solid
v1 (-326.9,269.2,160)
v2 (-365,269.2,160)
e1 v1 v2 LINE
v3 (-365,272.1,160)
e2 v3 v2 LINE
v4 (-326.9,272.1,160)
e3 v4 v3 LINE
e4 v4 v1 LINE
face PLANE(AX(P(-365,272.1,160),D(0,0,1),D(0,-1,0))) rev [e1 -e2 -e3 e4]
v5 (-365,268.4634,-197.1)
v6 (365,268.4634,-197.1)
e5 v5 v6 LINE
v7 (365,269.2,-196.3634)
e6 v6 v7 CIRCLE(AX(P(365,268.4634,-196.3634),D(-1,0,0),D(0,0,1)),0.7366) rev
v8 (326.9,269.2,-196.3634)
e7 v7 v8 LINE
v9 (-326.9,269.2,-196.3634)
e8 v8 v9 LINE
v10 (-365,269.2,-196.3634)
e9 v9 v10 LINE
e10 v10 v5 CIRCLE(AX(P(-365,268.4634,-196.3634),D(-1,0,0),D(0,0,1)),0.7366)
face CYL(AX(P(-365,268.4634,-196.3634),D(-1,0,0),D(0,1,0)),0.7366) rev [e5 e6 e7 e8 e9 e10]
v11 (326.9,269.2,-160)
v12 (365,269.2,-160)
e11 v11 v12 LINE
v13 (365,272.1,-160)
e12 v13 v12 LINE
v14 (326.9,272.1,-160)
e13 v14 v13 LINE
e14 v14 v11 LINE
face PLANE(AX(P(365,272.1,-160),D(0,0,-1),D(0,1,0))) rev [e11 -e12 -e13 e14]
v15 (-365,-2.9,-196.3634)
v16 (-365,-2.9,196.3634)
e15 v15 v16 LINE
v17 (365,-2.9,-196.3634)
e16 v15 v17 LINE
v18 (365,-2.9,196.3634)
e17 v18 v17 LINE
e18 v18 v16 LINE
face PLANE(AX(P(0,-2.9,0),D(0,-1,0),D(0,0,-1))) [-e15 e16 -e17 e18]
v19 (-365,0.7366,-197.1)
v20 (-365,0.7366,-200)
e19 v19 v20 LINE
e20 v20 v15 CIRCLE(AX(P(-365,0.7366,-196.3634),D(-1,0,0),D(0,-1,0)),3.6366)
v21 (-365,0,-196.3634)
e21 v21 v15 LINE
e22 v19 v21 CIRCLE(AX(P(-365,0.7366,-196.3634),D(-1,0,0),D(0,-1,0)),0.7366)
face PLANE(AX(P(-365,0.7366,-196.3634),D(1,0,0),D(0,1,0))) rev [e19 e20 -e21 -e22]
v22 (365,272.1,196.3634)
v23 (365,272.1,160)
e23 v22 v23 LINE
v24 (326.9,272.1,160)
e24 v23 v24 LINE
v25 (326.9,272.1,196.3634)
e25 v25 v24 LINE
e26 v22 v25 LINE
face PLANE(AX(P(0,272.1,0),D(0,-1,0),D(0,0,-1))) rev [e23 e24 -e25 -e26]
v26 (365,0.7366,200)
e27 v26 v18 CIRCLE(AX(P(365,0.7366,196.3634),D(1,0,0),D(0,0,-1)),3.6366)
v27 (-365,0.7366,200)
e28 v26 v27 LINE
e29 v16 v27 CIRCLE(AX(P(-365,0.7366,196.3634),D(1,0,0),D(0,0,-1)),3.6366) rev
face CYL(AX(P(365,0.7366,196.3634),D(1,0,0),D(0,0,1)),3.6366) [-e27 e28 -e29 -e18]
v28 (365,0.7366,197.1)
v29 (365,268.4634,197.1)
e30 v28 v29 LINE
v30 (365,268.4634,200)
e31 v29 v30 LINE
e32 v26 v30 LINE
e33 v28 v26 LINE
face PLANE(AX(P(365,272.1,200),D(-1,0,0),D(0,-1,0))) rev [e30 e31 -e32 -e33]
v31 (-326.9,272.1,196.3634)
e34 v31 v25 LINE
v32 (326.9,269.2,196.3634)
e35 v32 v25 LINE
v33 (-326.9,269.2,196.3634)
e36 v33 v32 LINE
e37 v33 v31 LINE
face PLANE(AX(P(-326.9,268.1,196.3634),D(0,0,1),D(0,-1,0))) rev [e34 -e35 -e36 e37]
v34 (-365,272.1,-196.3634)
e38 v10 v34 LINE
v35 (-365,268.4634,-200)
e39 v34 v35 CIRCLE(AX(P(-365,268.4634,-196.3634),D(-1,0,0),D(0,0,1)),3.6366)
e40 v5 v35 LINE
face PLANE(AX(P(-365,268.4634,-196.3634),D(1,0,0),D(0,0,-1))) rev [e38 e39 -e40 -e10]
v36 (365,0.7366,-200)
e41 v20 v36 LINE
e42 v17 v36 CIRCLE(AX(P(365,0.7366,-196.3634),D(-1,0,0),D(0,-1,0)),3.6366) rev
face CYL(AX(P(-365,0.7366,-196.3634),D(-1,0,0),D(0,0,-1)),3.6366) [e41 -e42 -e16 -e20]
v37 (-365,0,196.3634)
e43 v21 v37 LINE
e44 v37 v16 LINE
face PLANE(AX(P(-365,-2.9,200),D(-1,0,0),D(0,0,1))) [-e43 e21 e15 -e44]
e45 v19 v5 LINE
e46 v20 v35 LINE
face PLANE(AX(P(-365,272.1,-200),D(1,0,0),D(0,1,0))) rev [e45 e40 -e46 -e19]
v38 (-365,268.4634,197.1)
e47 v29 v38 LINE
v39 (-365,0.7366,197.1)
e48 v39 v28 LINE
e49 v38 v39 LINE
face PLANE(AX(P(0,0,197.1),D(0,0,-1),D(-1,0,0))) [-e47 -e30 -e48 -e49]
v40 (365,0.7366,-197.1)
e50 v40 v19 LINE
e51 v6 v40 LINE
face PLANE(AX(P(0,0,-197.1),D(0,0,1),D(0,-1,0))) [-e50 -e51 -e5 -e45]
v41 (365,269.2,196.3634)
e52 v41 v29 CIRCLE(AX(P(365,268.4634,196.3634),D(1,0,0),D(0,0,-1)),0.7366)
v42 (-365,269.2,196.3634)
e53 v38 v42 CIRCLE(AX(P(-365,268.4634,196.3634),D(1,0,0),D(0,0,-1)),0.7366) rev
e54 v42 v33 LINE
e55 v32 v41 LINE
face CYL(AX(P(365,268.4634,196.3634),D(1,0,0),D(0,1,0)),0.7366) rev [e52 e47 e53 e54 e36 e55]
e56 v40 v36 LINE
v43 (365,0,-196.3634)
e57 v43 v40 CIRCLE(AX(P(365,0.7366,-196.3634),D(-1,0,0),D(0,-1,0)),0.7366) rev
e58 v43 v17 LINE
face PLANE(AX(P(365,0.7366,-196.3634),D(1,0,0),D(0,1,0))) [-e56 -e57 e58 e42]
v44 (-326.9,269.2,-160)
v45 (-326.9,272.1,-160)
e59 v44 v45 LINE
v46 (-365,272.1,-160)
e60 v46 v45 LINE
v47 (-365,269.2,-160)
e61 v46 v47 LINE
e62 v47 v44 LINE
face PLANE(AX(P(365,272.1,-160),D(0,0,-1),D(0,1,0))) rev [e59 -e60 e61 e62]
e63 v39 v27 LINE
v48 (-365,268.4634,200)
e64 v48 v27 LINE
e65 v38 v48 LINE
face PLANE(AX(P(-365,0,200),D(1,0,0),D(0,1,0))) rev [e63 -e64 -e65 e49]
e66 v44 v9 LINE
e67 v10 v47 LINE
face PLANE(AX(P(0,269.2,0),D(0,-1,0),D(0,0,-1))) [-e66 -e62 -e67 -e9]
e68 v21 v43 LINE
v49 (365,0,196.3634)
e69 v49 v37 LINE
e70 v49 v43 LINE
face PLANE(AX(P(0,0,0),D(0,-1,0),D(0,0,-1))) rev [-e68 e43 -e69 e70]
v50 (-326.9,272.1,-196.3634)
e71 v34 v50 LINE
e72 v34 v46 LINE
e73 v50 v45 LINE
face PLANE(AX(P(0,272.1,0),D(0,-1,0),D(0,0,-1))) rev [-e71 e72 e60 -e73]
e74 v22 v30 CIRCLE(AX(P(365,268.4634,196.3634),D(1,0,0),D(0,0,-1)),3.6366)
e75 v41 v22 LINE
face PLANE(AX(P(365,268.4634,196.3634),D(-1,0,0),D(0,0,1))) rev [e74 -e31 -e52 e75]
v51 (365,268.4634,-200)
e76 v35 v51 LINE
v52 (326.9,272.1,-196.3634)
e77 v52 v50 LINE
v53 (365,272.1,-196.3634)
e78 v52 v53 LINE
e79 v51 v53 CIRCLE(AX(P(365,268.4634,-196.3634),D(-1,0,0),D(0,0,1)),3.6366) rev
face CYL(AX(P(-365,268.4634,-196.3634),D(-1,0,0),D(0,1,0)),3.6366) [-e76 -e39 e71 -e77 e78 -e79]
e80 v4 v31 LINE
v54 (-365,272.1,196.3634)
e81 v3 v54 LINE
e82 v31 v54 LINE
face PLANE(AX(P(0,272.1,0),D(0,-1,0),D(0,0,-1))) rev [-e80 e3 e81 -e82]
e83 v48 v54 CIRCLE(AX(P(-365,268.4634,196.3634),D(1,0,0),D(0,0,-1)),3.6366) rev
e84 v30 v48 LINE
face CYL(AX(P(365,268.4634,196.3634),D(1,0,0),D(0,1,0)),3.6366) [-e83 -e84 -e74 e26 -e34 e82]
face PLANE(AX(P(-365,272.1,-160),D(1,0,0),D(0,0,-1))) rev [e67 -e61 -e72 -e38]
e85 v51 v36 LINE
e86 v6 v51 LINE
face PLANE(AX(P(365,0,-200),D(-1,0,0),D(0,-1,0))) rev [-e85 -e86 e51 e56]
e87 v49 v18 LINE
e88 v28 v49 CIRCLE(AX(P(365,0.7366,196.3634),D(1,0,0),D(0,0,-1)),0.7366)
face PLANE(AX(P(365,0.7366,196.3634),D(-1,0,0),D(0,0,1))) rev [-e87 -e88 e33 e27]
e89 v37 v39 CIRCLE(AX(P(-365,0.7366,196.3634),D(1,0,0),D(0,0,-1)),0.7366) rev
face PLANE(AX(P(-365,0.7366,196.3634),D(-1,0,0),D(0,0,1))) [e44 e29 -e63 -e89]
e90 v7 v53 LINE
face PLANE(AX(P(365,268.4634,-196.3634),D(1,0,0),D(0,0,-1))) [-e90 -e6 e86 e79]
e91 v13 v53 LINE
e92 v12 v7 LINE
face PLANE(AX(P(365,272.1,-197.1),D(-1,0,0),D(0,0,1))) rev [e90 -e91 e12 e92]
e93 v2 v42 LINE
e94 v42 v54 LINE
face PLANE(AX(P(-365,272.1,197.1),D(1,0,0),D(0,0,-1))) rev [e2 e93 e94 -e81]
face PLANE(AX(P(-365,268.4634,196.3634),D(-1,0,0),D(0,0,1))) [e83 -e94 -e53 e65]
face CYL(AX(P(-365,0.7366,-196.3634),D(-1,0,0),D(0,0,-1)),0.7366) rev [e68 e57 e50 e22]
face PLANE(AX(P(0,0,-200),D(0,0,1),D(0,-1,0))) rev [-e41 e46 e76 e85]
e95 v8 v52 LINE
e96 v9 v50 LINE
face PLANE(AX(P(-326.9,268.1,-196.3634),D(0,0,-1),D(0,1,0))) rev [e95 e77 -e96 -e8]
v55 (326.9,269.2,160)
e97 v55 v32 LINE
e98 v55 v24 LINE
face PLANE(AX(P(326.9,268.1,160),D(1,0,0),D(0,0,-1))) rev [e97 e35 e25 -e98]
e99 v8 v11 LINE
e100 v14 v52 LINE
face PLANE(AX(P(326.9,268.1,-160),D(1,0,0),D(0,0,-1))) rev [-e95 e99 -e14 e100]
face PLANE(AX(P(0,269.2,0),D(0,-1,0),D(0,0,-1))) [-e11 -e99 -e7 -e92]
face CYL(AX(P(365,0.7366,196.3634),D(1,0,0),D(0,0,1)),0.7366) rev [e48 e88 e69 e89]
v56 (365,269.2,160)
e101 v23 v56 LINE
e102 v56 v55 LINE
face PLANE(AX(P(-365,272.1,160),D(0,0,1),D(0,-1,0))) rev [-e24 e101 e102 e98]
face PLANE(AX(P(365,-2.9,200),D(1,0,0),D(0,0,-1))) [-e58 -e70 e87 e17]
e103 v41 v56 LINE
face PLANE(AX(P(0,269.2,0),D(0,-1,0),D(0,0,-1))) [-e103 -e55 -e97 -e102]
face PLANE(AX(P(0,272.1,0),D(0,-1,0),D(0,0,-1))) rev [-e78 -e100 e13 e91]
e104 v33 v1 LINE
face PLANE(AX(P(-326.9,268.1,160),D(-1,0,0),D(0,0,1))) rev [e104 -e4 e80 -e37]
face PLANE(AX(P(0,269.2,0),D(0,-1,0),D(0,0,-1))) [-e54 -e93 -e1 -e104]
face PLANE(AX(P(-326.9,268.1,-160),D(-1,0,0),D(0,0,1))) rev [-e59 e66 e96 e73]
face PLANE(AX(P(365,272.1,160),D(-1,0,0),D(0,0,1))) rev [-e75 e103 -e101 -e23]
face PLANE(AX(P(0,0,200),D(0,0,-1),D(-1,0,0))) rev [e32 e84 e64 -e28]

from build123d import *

# Parameters (mm, degrees)
CROQUIS1_W                         = 730
CROQUIS1_H                         = 400
BRIDA_BASE1_DEPTH                  = 2.9
BRIDA_DE_ARISTA1_STRIP_W           = 13.0732
BRIDA_DE_ARISTA1_STRIP_H           = 2.9
BRIDA_DE_ARISTA1_STRIP_CUT_DEPTH   = 730
BRIDA_DE_ARISTA1_STRIP_2_W         = 13.0732
BRIDA_DE_ARISTA1_STRIP_2_H         = 2.9
BRIDA_DE_ARISTA1_STRIP_CUT_2_DEPTH = 730
BRIDA_DE_ARISTA1_DEPTH             = 730
BRIDA_DE_ARISTA1_BEND_DEPTH        = 730
BRIDA_DE_ARISTA2_STRIP_W           = 13.0732
BRIDA_DE_ARISTA2_STRIP_H           = 2.9
BRIDA_DE_ARISTA2_STRIP_CUT_DEPTH   = 730
BRIDA_DE_ARISTA2_STRIP_2_W         = 13.0732
BRIDA_DE_ARISTA2_STRIP_2_H         = 2.9
BRIDA_DE_ARISTA2_STRIP_CUT_2_DEPTH = 730
BRIDA_DE_ARISTA2_DEPTH             = 730
BRIDA_DE_ARISTA2_BEND_DEPTH        = 730
CROQUIS18_W                        = 653.8
CROQUIS18_H                        = 36.3634
CORTAR_EXTRUIR1_DEPTH              = 4


# Sheet-metal steps are written as plain solids
with BuildPart() as part:
    # Croquis1 → Brida base1 (new body)
    with BuildSketch(Plane(origin=(0, 0, 0), x_dir=(1, 0, 0), z_dir=(0, 1, 0))):
        Rectangle(CROQUIS1_W, CROQUIS1_H)
    extrude(amount=-BRIDA_BASE1_DEPTH)

    # Brida de arista1 strip (across the edge) → Brida de arista1 strip cut (cut)
    with BuildSketch(Plane(origin=(365, 0, -200), x_dir=(0, 0, 1), z_dir=(-1, 0, 0))):
        with Locations((-2.9, -1.45)):
            Rectangle(BRIDA_DE_ARISTA1_STRIP_W, BRIDA_DE_ARISTA1_STRIP_H)
    extrude(amount=BRIDA_DE_ARISTA1_STRIP_CUT_DEPTH, mode=Mode.SUBTRACT)

    # Brida de arista1 strip 2 (across the edge) → Brida de arista1 strip cut 2 (cut)
    with BuildSketch(Plane(origin=(-365, 0, 200), x_dir=(0, 0, -1), z_dir=(1, 0, 0))):
        with Locations((-2.9, -1.45)):
            Rectangle(BRIDA_DE_ARISTA1_STRIP_2_W, BRIDA_DE_ARISTA1_STRIP_2_H)
    extrude(amount=BRIDA_DE_ARISTA1_STRIP_CUT_2_DEPTH, mode=Mode.SUBTRACT)

    # Brida de arista1 section (across the edge) → Brida de arista1 (add)
    with BuildSketch(Plane(origin=(365, 0, -200), x_dir=(0, 0, 1), z_dir=(-1, 0, 0))):
        with BuildLine():
            Line((0, 0.7366), (0, 272.1))
            Line((0, 272.1), (2.9, 272.1))
            Line((2.9, 272.1), (2.9, 0.7366))
            ThreePointArc((2.9, 0.7366), (3.115745145, 0.215745145), (3.6366, 0))
            Line((3.6366, 0), (3.6366, -2.9))
            ThreePointArc((3.6366, -2.9), (1.06513548, -1.83486452), (0, 0.7366))
        make_face()
    extrude(amount=BRIDA_DE_ARISTA1_DEPTH)

    # Brida de arista1 section 2 (across the edge) → Brida de arista1 bend (add)
    with BuildSketch(Plane(origin=(-365, 0, 200), x_dir=(0, 0, -1), z_dir=(1, 0, 0))):
        with BuildLine():
            Line((0, 0.7366), (0, 272.1))
            Line((0, 272.1), (2.9, 272.1))
            Line((2.9, 272.1), (2.9, 0.7366))
            ThreePointArc((2.9, 0.7366), (3.115745145, 0.215745145), (3.6366, 0))
            Line((3.6366, 0), (3.6366, -2.9))
            ThreePointArc((3.6366, -2.9), (1.06513548, -1.83486452), (0, 0.7366))
        make_face()
    extrude(amount=BRIDA_DE_ARISTA1_BEND_DEPTH)

    # Brida de arista2 strip (across the edge) → Brida de arista2 strip cut (cut)
    with BuildSketch(Plane(origin=(365, 272.1, -197.1), x_dir=(0, -1, 0), z_dir=(-1, 0, 0))):
        with Locations((-2.9, -1.45)):
            Rectangle(BRIDA_DE_ARISTA2_STRIP_W, BRIDA_DE_ARISTA2_STRIP_H)
    extrude(amount=BRIDA_DE_ARISTA2_STRIP_CUT_DEPTH, mode=Mode.SUBTRACT)

    # Brida de arista2 strip 2 (across the edge) → Brida de arista2 strip cut 2 (cut)
    with BuildSketch(Plane(origin=(-365, 272.1, 197.1), x_dir=(0, -1, 0), z_dir=(1, 0, 0))):
        with Locations((-2.9, -1.45)):
            Rectangle(BRIDA_DE_ARISTA2_STRIP_2_W, BRIDA_DE_ARISTA2_STRIP_2_H)
    extrude(amount=BRIDA_DE_ARISTA2_STRIP_CUT_2_DEPTH, mode=Mode.SUBTRACT)

    # Brida de arista2 section (across the edge) → Brida de arista2 (add)
    with BuildSketch(Plane(origin=(365, 272.1, -197.1), x_dir=(0, -1, 0), z_dir=(-1, 0, 0))):
        with BuildLine():
            Line((0, 0.7366), (0, 37.1))
            Line((0, 37.1), (2.9, 37.1))
            Line((2.9, 37.1), (2.9, 0.7366))
            ThreePointArc((2.9, 0.7366), (3.115745145, 0.215745145), (3.6366, 0))
            Line((3.6366, 0), (3.6366, -2.9))
            ThreePointArc((3.6366, -2.9), (1.06513548, -1.83486452), (0, 0.7366))
        make_face()
    extrude(amount=BRIDA_DE_ARISTA2_DEPTH)

    # Brida de arista2 section 2 (across the edge) → Brida de arista2 bend (add)
    with BuildSketch(Plane(origin=(-365, 272.1, 197.1), x_dir=(0, -1, 0), z_dir=(1, 0, 0))):
        with BuildLine():
            Line((0, 0.7366), (0, 37.1))
            Line((0, 37.1), (2.9, 37.1))
            Line((2.9, 37.1), (2.9, 0.7366))
            ThreePointArc((2.9, 0.7366), (3.115745145, 0.215745145), (3.6366, 0))
            Line((3.6366, 0), (3.6366, -2.9))
            ThreePointArc((3.6366, -2.9), (1.06513548, -1.83486452), (0, 0.7366))
        make_face()
    extrude(amount=BRIDA_DE_ARISTA2_BEND_DEPTH)

    # Croquis18 → Cortar-Extruir1 (cut)
    with BuildSketch(Plane(origin=(0, 272.1, 0), x_dir=(1, 0, 0), z_dir=(0, 1, 0))):
        with Locations((0, -178.1817)):
            Rectangle(CROQUIS18_W, CROQUIS18_H)
        with Locations((0, 178.1817)):
            Rectangle(CROQUIS18_W, CROQUIS18_H)
    extrude(amount=-CORTAR_EXTRUIR1_DEPTH, mode=Mode.SUBTRACT)


solid = part.part
